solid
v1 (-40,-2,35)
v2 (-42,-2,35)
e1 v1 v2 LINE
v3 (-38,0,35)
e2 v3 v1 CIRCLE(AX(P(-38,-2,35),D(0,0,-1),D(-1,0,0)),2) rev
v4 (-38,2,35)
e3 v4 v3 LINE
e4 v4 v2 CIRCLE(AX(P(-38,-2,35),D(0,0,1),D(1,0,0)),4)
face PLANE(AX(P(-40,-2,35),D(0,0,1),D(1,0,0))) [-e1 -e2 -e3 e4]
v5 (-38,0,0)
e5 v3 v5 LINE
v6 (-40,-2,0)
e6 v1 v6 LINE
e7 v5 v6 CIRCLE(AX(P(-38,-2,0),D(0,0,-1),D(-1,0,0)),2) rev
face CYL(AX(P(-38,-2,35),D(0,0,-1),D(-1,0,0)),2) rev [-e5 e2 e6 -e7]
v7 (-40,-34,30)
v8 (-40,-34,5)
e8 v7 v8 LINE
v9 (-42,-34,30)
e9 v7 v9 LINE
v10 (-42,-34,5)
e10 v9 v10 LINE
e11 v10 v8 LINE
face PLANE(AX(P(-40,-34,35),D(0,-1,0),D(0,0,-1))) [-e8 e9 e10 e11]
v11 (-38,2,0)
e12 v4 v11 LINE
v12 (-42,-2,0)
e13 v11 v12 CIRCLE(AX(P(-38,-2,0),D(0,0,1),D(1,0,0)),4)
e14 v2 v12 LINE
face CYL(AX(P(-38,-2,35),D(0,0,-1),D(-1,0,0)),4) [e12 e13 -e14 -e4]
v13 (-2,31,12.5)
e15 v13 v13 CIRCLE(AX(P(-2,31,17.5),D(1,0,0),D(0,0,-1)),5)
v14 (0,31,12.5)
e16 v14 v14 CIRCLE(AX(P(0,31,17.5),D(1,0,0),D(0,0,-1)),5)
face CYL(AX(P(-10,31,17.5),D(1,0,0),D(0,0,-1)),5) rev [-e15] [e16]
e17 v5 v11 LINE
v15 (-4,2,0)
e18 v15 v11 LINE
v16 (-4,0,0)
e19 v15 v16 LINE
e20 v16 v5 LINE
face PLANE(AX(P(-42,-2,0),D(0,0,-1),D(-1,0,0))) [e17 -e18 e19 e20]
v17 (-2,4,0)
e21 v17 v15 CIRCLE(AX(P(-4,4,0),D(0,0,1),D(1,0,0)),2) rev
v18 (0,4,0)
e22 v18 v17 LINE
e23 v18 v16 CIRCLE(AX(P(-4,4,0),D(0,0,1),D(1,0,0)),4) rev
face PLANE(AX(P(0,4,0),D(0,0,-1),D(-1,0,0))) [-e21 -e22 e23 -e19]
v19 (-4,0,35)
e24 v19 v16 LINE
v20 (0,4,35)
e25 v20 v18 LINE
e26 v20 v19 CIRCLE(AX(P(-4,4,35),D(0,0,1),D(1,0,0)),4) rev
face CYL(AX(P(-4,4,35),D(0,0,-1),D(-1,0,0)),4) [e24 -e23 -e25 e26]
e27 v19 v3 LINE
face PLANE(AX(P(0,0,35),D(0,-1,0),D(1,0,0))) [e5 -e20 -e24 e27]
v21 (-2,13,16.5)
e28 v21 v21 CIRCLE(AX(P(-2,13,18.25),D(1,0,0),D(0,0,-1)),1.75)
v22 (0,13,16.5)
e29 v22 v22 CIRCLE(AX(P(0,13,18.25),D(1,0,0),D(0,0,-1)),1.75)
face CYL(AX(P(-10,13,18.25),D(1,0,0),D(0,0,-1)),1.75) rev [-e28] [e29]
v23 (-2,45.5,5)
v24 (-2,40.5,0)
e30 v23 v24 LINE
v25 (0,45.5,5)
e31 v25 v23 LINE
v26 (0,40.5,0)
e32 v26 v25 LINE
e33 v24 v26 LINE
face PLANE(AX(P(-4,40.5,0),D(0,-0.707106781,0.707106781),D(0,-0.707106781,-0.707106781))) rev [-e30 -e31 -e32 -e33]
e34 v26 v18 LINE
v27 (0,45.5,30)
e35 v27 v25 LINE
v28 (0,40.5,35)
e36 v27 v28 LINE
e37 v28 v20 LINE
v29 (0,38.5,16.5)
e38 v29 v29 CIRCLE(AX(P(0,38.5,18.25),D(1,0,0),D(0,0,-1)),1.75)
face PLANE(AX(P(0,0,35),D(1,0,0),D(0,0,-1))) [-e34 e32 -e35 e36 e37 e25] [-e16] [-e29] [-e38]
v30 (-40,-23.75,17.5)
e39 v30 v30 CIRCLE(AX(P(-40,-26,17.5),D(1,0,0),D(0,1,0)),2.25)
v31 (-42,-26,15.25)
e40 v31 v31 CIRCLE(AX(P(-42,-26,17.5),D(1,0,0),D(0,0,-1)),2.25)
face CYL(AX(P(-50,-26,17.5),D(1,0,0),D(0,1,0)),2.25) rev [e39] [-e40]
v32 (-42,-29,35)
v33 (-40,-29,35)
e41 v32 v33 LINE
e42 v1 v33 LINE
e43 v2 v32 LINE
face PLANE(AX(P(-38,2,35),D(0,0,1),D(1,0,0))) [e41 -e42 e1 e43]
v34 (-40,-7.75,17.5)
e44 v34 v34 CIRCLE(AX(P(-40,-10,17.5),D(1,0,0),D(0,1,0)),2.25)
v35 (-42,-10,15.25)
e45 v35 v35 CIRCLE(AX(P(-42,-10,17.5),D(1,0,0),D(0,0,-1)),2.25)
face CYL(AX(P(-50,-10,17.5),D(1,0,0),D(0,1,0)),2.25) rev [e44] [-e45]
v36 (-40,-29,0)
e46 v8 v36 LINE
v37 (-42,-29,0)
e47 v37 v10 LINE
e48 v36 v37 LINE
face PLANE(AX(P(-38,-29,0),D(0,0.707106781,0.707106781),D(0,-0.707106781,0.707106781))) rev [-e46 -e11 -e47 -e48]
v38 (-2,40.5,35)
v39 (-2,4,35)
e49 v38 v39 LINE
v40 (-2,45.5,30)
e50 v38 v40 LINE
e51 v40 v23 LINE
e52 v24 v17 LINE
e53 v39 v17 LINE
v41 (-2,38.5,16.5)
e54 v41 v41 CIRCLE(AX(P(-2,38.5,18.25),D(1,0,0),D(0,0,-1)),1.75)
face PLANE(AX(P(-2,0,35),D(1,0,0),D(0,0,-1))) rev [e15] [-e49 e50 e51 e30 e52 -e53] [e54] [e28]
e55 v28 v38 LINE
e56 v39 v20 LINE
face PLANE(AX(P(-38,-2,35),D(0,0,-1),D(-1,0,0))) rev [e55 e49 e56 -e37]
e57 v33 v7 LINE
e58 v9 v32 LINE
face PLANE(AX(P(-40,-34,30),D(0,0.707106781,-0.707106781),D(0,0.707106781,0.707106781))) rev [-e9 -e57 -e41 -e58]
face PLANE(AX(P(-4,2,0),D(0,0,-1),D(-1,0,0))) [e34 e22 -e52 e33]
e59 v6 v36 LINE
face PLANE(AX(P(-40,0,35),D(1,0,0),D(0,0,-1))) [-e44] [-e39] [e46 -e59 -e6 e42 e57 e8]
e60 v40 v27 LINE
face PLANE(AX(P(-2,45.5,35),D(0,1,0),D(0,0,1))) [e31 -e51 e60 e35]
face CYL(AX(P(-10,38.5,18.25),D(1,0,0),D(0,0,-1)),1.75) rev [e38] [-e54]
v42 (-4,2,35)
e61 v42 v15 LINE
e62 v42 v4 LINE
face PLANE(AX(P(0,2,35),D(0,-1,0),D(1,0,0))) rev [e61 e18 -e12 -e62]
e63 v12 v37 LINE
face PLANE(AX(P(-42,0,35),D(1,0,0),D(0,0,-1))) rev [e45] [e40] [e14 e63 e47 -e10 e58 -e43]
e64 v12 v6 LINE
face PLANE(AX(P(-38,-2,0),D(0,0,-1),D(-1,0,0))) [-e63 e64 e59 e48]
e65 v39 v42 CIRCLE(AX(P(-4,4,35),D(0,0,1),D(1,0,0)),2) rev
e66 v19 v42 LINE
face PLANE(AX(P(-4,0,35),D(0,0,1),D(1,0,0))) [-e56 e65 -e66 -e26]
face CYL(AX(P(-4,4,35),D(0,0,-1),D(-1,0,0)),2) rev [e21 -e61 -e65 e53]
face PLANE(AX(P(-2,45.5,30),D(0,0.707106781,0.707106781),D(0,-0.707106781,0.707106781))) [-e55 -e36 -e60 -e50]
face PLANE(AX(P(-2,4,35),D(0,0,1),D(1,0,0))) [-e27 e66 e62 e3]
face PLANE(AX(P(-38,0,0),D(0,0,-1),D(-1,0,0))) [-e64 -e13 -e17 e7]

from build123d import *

# Parameters (mm, degrees)
BASE_FLANGE1_DEPTH = 35
SKETCH3_R          = 5
SKETCH3_R_2        = 1.75
CUT_EXTRUDE1_DEPTH = 10
CHAMFER1_SIZE      = 5
SKETCH4_R          = 2.25
CUT_EXTRUDE2_DEPTH = 10


# Sheet-metal steps are written as plain solids
with BuildPart() as part:
    # Sketch1 → Base-Flange1 (new body)
    with BuildSketch(Plane.XY):
        with BuildLine():
            Line((-40, -34), (-40, -2))
            ThreePointArc((-40, -2), (-39.414213562, -0.585786438), (-38, 0))
            Line((-38, 0), (-4, 0))
            ThreePointArc((-4, 0), (-1.171572875, 1.171572875), (0, 4))
            Line((0, 4), (0, 45.5))
            Line((0, 45.5), (-2, 45.5))
            Line((-2, 45.5), (-2, 4))
            ThreePointArc((-2, 4), (-2.585786438, 2.585786438), (-4, 2))
            Line((-4, 2), (-38, 2))
            ThreePointArc((-38, 2), (-40.828427125, 0.828427125), (-42, -2))
            Line((-42, -2), (-42, -34))
            Line((-42, -34), (-40, -34))
        make_face()
    extrude(amount=BASE_FLANGE1_DEPTH)

    # Sketch3 → Cut-Extrude1 (cut)
    with BuildSketch(Plane(origin=(0, 0, 0), x_dir=(0, 0, -1), z_dir=(1, 0, 0))):
        with Locations((-17.5, 31)):
            Circle(SKETCH3_R)
        with Locations((-18.25, 13)):
            Circle(SKETCH3_R_2)
        with Locations((-18.25, 38.5)):
            Circle(SKETCH3_R_2)
    extrude(amount=-CUT_EXTRUDE1_DEPTH, mode=Mode.SUBTRACT)

    # Chamfer1
    chamfer1_edges = [part.edges().sort_by_distance(p)[0] for p in [
        (-1, 45.5, 0),
        (-41, -34, 0),
        (-1, 45.5, 35),
        (-41, -34, 35),
    ]]
    chamfer(chamfer1_edges, length=CHAMFER1_SIZE)

    # Sketch4 → Cut-Extrude2 (cut)
    with BuildSketch(Plane(origin=(-40, 0, 0), x_dir=(0, 0, -1), z_dir=(1, 0, 0))):
        with Locations(Location((-17.5, -26, 0), (0, 0, 90))):
            Circle(SKETCH4_R)
        with Locations(Location((-17.5, -10, 0), (0, 0, 90))):
            Circle(SKETCH4_R)
    extrude(amount=-CUT_EXTRUDE2_DEPTH, mode=Mode.SUBTRACT)


solid = part.part
